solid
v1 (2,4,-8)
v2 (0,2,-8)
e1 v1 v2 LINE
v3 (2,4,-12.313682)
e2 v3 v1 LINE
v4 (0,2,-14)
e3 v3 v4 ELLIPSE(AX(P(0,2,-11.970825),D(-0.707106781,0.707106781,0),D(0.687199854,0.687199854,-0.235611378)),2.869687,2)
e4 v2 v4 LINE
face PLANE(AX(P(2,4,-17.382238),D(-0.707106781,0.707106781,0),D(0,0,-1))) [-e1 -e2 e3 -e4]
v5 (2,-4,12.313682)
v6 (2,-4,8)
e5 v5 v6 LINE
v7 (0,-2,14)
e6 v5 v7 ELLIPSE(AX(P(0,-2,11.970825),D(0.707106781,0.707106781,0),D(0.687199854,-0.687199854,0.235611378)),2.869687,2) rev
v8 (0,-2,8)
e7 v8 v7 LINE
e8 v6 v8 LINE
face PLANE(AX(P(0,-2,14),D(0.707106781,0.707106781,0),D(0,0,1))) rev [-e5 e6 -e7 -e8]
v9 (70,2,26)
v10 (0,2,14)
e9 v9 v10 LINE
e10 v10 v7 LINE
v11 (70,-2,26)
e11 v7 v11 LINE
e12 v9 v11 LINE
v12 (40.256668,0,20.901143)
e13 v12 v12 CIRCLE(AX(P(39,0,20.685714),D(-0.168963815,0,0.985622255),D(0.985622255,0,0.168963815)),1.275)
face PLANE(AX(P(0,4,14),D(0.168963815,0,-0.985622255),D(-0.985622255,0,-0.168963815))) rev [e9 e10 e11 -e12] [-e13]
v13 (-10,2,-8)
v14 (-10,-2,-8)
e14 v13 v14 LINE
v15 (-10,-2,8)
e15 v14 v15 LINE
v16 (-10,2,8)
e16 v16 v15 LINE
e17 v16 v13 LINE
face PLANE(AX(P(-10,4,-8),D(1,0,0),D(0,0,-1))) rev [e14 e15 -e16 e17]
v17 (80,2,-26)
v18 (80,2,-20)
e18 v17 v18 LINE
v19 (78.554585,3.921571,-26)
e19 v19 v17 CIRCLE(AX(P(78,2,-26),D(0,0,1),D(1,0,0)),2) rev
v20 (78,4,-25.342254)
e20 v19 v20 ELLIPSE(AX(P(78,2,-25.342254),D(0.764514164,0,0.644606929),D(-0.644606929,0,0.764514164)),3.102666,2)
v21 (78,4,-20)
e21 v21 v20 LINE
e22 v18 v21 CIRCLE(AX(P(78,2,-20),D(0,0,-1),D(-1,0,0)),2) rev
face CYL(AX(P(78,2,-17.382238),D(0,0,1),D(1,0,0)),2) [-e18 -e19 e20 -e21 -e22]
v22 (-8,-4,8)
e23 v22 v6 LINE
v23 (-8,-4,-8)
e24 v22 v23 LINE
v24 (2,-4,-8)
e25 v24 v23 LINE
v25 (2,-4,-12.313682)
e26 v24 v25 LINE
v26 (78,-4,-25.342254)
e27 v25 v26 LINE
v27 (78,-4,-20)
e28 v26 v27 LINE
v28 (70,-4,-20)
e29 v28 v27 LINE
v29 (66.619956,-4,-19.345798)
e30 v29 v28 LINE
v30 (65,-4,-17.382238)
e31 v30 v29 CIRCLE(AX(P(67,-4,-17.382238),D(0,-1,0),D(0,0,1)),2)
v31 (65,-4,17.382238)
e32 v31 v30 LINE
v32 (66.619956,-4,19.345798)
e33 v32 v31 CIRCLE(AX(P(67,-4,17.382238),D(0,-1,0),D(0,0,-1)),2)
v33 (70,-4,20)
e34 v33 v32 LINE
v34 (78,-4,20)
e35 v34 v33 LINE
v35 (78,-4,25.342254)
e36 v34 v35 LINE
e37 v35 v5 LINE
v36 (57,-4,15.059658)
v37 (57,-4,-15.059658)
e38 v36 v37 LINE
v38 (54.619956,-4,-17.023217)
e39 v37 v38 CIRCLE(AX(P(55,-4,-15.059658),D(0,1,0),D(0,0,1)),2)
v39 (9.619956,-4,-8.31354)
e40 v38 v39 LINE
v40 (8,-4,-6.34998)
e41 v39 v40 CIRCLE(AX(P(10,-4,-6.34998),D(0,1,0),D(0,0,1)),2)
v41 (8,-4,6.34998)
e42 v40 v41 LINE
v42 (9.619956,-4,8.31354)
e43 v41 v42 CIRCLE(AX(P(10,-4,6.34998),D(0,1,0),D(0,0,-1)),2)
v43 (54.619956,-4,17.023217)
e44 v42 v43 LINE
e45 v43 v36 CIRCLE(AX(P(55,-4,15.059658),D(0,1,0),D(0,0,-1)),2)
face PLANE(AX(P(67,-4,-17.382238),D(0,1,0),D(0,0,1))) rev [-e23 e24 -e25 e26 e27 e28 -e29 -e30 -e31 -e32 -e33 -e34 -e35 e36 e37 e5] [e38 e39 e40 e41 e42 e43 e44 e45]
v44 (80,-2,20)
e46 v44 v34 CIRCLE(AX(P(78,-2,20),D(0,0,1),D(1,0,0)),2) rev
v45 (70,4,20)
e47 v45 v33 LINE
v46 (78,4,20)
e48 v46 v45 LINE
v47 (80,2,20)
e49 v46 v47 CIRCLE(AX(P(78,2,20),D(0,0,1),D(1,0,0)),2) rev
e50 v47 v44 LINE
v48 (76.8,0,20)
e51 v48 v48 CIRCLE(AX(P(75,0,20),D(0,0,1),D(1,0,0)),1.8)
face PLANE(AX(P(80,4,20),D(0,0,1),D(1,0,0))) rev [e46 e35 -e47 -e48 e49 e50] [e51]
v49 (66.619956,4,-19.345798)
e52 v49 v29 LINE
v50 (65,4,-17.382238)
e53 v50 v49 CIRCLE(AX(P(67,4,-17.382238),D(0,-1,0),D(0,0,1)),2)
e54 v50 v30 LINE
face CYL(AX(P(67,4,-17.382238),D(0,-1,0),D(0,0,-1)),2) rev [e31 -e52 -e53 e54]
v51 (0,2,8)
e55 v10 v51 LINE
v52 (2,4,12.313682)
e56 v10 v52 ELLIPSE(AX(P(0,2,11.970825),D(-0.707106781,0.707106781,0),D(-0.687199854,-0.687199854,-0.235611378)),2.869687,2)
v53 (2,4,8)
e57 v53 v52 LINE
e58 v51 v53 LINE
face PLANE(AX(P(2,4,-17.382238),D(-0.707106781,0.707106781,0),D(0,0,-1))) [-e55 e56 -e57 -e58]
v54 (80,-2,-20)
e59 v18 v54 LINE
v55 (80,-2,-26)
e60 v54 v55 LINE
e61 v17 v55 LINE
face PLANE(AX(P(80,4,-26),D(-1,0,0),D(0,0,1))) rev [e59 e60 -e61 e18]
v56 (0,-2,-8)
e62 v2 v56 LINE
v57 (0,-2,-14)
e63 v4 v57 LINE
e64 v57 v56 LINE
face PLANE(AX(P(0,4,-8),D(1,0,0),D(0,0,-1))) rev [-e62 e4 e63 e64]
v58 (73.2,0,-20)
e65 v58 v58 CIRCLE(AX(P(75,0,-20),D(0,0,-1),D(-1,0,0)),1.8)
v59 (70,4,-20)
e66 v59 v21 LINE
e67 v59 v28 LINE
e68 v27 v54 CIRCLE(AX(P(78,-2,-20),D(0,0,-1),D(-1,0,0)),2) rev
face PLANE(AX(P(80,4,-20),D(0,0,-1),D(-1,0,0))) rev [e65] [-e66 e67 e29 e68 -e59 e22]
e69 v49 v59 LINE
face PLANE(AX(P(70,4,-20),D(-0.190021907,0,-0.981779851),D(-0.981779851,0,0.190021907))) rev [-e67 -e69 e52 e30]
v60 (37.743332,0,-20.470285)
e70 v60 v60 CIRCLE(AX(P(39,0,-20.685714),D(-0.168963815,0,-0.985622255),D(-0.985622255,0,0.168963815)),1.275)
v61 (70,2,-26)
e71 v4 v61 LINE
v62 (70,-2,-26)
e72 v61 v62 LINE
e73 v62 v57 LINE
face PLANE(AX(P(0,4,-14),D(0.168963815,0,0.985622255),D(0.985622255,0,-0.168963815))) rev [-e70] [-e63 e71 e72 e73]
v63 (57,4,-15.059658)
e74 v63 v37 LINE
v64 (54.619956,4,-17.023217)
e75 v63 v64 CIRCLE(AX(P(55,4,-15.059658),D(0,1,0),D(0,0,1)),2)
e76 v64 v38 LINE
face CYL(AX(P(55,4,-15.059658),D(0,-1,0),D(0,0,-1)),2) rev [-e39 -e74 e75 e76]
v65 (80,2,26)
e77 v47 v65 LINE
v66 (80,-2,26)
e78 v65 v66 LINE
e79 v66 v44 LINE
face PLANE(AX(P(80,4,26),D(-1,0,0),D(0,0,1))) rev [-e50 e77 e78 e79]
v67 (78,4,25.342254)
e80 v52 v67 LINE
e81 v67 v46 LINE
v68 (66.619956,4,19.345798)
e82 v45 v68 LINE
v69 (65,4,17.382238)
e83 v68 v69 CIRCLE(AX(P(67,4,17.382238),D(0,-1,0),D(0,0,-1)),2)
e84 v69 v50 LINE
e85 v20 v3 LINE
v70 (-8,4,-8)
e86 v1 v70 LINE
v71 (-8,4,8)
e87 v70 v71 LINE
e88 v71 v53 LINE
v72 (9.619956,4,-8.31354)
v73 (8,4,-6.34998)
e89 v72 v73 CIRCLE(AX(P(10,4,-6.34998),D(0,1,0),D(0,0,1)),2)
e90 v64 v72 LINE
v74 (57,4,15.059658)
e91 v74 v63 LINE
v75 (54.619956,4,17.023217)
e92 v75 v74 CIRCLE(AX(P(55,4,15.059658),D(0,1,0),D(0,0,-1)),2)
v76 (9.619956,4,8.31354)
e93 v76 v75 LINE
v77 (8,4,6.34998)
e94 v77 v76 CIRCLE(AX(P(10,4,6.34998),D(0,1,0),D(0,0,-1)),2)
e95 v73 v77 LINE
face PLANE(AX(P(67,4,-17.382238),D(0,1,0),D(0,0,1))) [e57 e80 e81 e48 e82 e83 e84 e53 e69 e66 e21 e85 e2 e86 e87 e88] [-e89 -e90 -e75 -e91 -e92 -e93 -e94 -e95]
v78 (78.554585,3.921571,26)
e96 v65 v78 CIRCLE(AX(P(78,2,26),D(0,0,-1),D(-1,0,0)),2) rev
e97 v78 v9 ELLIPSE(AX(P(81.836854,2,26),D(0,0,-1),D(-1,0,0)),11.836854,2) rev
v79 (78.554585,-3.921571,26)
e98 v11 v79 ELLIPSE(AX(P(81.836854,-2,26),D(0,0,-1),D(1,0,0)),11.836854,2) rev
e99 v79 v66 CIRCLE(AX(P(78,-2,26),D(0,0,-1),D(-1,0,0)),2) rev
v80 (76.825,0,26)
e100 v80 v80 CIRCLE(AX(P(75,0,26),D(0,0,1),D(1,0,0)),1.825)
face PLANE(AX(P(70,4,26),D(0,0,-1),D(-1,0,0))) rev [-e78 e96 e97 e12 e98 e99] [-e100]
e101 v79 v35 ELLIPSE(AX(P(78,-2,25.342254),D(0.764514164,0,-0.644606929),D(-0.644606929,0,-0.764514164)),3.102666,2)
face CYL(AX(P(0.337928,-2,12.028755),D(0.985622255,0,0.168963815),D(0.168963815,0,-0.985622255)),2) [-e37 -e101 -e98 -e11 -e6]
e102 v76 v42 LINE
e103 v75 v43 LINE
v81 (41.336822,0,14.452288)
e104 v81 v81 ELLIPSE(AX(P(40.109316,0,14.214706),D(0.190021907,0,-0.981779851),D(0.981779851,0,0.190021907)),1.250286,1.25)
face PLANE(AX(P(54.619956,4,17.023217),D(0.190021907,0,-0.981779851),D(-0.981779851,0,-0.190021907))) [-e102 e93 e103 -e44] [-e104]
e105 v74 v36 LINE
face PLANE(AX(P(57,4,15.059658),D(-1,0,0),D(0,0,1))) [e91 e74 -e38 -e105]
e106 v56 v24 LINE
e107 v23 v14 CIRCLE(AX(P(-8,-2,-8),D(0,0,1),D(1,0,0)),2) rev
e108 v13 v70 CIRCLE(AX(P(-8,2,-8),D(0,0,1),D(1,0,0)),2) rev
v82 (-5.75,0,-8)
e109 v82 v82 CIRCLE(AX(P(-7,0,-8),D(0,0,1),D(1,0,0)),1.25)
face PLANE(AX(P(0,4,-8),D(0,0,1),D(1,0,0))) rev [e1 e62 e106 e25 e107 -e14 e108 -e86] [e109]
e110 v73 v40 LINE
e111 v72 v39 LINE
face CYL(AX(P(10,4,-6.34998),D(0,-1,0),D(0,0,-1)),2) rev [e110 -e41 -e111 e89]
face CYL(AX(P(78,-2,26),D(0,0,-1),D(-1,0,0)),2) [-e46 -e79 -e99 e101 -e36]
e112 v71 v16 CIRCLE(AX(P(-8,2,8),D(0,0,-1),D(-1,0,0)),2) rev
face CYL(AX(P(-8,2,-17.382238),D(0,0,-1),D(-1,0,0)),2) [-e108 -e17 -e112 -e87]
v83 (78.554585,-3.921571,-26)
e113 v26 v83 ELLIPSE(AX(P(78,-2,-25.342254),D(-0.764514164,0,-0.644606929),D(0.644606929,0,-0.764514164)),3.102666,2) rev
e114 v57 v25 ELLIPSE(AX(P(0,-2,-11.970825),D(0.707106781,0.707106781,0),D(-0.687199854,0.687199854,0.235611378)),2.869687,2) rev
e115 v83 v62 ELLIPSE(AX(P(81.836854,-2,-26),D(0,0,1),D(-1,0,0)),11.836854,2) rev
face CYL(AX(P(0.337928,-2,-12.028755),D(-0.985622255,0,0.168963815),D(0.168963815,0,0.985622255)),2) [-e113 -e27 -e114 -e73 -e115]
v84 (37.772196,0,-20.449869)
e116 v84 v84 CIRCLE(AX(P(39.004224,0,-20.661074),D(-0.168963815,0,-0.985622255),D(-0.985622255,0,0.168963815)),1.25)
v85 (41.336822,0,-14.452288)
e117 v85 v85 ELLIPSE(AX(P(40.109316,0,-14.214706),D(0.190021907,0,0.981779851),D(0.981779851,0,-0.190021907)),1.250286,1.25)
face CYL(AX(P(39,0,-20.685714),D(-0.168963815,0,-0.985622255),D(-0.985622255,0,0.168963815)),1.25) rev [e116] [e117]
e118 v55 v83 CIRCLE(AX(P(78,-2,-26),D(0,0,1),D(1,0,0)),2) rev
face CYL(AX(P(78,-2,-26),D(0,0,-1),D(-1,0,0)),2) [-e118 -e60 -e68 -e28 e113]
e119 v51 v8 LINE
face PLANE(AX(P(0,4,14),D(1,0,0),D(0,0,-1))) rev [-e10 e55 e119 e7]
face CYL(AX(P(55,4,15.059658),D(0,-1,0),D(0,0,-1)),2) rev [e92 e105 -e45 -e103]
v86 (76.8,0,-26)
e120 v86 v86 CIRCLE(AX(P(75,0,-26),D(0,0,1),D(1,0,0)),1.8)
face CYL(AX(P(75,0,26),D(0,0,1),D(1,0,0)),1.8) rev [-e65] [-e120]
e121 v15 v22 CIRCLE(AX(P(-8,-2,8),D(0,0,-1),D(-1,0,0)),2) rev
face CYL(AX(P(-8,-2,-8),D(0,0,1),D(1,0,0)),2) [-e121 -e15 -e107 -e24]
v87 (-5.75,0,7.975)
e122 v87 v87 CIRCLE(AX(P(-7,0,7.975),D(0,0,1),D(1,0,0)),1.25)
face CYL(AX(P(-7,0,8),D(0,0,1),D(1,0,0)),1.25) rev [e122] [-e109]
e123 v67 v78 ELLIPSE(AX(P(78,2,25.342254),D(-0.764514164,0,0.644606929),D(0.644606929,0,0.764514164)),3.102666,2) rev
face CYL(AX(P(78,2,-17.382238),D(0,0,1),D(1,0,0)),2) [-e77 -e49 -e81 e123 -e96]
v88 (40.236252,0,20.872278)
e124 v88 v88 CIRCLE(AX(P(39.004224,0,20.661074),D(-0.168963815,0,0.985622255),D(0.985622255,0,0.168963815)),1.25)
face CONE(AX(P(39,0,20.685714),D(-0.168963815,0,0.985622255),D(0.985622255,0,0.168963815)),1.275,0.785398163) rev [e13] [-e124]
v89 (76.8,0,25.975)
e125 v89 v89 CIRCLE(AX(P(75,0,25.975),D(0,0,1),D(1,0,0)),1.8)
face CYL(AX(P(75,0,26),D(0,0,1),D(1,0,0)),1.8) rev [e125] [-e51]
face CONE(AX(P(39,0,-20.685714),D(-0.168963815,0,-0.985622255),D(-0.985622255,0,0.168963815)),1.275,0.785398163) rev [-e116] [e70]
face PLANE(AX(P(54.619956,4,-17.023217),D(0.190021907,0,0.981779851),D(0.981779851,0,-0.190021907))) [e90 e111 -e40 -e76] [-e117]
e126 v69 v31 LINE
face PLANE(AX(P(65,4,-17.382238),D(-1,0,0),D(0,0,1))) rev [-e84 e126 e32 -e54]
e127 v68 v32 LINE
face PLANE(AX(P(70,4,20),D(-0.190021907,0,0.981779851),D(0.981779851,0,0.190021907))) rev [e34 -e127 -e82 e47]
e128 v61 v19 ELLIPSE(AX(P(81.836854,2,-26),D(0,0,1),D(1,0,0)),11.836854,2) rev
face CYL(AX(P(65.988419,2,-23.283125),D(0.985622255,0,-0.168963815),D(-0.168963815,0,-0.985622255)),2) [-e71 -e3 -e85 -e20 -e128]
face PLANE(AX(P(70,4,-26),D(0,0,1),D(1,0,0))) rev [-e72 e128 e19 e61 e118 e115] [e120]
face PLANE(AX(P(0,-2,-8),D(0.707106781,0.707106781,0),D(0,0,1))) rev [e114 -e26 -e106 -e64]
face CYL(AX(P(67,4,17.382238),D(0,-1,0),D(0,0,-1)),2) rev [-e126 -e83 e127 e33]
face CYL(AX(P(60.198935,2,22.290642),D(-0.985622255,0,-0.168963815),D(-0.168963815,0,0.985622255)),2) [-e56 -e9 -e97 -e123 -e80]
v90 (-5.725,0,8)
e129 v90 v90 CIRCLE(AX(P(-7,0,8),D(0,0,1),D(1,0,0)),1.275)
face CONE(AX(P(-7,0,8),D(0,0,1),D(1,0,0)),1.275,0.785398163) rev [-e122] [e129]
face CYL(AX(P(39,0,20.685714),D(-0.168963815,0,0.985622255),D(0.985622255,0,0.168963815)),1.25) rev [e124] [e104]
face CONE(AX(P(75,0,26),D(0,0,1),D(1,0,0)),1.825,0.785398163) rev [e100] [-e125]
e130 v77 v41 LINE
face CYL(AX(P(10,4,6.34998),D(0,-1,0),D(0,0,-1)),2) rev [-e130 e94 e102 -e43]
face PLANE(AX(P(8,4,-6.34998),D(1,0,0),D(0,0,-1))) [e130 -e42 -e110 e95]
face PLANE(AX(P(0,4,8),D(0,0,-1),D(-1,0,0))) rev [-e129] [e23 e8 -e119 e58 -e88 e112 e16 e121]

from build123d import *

# Parameters (mm, degrees)
BOSS_EXTRUDE1_DEPTH                   = 4
SKETCH3_R                             = 1
CUT_EXTRUDE2_DEPTH                    = 96.498691091
SKETCH4_R                             = 1
CUT_EXTRUDE3_DEPTH                    = 88.017239671
TAP_DRILL_FOR_M3X0_5_TAP2_D           = 2.5
TAP_DRILL_FOR_M3X0_5_TAP2_CSINK_D     = 2.55
TAP_DRILL_FOR_M3X0_5_TAP2_CSINK_ANGLE = 90
M3_CLEARANCE_HOLE2_D                  = 3.6
M3_CLEARANCE_HOLE2_CSINK_D            = 3.65
M3_CLEARANCE_HOLE2_CSINK_ANGLE        = 90
FILLET1_R                             = 2
CHAMFER1_SIZE                         = 2
FILLET2_R                             = 2


# Read off the part's stored shape, not the designer's step: Tap Drill for M3x0.5 Tap4, Tap Drill for M3x0.5 Tap5
with BuildPart() as part:
    # Sketch1 → Boss-Extrude1 (new, symmetric)
    with BuildSketch(Plane(origin=(0, 0, 0), x_dir=(1, 0, 0), z_dir=(0, 1, 0))):
        with BuildLine():
            Line((0, 8), (-10, 8))
            Line((-10, 8), (-10, -8))
            Line((-10, -8), (0, -8))
            Line((0, -8), (0, -14))
            Line((0, -14), (70, -26))
            Line((70, -26), (80, -26))
            Line((80, -26), (80, -20))
            Line((80, -20), (70, -20))
            Line((70, -20), (66.619956187, -19.345797972))
            ThreePointArc((66.619956187, -19.345797972), (65.457260938, -18.655013265), (65, -17.38223827))
            Line((65, -17.38223827), (65, 17.38223827))
            ThreePointArc((65, 17.38223827), (65.457260938, 18.655013265), (66.619956187, 19.345797972))
            Line((66.619956187, 19.345797972), (70, 20))
            Line((70, 20), (80, 20))
            Line((80, 20), (80, 26))
            Line((80, 26), (70, 26))
            Line((70, 26), (0, 14))
            Line((0, 14), (0, 8))
        make_face()
        with BuildLine():
            Line((8, 6.349980206), (8, -6.349980206))
            ThreePointArc((8, -6.349980206), (8.457260938, -7.622755201), (9.619956187, -8.313539907))
            Line((9.619956187, -8.313539907), (54.619956187, -17.023217326))
            ThreePointArc((54.619956187, -17.023217326), (56.272774995, -16.602396687), (57, -15.059657625))
            Line((57, -15.059657625), (57, 15.059657625))
            ThreePointArc((57, 15.059657625), (56.272774995, 16.602396687), (54.619956187, 17.023217326))
            Line((54.619956187, 17.023217326), (9.619956187, 8.313539907))
            ThreePointArc((9.619956187, 8.313539907), (8.457260938, 7.622755201), (8, 6.349980206))
        make_face(mode=Mode.SUBTRACT)
    extrude(amount=BOSS_EXTRUDE1_DEPTH, both=True)

    # Sketch3 → Cut-Extrude2 (cut, through all)
    with BuildSketch(Plane.XY.offset(26)):
        with Locations((75, 0)):
            Circle(SKETCH3_R)
    extrude(amount=-CUT_EXTRUDE2_DEPTH, mode=Mode.SUBTRACT)

    # Sketch4 → Cut-Extrude3 (cut, through all)
    with BuildSketch(Plane.XY.offset(8)):
        with Locations((-7, 0)):
            Circle(SKETCH4_R)
    extrude(amount=-CUT_EXTRUDE3_DEPTH, mode=Mode.SUBTRACT)

    # Tap Drill for M3x0.5 Tap2 (through all)
    with Locations(Plane.XY.offset(8)):
        with Locations((-7, 0)):
            CounterSinkHole(TAP_DRILL_FOR_M3X0_5_TAP2_D / 2, TAP_DRILL_FOR_M3X0_5_TAP2_CSINK_D / 2, counter_sink_angle=TAP_DRILL_FOR_M3X0_5_TAP2_CSINK_ANGLE)

    # M3 Clearance Hole2 (through all)
    with Locations(Plane.XY.offset(26)):
        with Locations((75, 0)):
            CounterSinkHole(M3_CLEARANCE_HOLE2_D / 2, M3_CLEARANCE_HOLE2_CSINK_D / 2, counter_sink_angle=M3_CLEARANCE_HOLE2_CSINK_ANGLE)

    # Fillet1
    fillet1_edges = [part.edges().sort_by_distance(p)[0] for p in [
        (-10, 4, 0),
        (80, -4, -23),
        (80, -4, 23),
        (-10, -4, 0),
        (80, 4, 23),
        (80, 4, -23),
    ]]
    fillet(fillet1_edges, radius=FILLET1_R)

    # Chamfer1
    chamfer1_edges = [part.edges().sort_by_distance(p)[0] for p in [
        (0, 4, 11),
        (0, -4, 11),
        (0, -4, -11),
        (0, 4, -11),
    ]]
    chamfer(chamfer1_edges, length=CHAMFER1_SIZE)

    # Tap Drill for M3x0.5 Tap4 outline → Tap Drill for M3x0.5 Tap4 (revolve, cut)
    with BuildSketch(Plane(origin=(41.33148295, 0, 7.085397077), x_dir=(0.9856222548132666, 0, 0.1689638151108459), z_dir=(0, 1, 0))):
        Polygon((1.25, -13.773711567), (1.25, -7.206179724), (0, -7.206179724), (0, -13.798711567), (1.275, -13.798711567), align=None)
    revolve(axis=Axis((41.33148295, 0, 7.085397077), (0.1689638151108459, 0, -0.9856222548132666)), mode=Mode.SUBTRACT)

    # Tap Drill for M3x0.5 Tap5 outline → Tap Drill for M3x0.5 Tap5 (revolve, cut)
    with BuildSketch(Plane(origin=(41.33148295, 0, -7.085397077), x_dir=(0.9856222548132666, 0, -0.1689638151108459), z_dir=(0, -1, 0))):
        Polygon((1.25, -13.773711567), (1.25, -7.206546017), (0, -7.206546017), (0, -13.798711567), (1.275, -13.798711567), align=None)
    revolve(axis=Axis((41.33148295, 0, -7.085397077), (0.1689638151108459, 0, 0.9856222548132666)), mode=Mode.SUBTRACT)

    # Fillet2
    # the kernel refuses this fillet: 2 mm, written as the material it takes off along each edge
    with BuildSketch(Plane(origin=(-9.827467058, -4, 12.315291362), x_dir=(0.1689638151108459, 0, -0.9856222548132667), z_dir=(0.9856222548132667, 0, 0.16896381511084588)), Plane(origin=(-9.827467058, 4, 12.315291362), x_dir=(0, -1, 0), z_dir=(0.9856222548132667, 0, 0.16896381511084588)), Plane(origin=(81.827467058, -4, -28.027565781), x_dir=(0.16896381511084588, 0, 0.9856222548132667), z_dir=(-0.9856222548132667, 0, 0.16896381511084588)), Plane(origin=(81.827467058, 4, -28.027565781), x_dir=(0, -1, 0), z_dir=(-0.9856222548132667, 0, 0.16896381511084588))) as fillet2_piece_1:
        with BuildLine():
            CenterArc((FILLET2_R, FILLET2_R), FILLET2_R, 180, 90)
            Line((0, FILLET2_R), (-FILLET2_R * 0.02, FILLET2_R))
            Line((-FILLET2_R * 0.02, FILLET2_R), (-FILLET2_R * 0.02, -FILLET2_R * 0.02))
            Line((-FILLET2_R * 0.02, -FILLET2_R * 0.02), (FILLET2_R, -FILLET2_R * 0.02))
            Line((FILLET2_R, -FILLET2_R * 0.02), (FILLET2_R, 0))
        make_face()
    extrude(amount=92.991948658, mode=Mode.SUBTRACT)


solid = part.part
